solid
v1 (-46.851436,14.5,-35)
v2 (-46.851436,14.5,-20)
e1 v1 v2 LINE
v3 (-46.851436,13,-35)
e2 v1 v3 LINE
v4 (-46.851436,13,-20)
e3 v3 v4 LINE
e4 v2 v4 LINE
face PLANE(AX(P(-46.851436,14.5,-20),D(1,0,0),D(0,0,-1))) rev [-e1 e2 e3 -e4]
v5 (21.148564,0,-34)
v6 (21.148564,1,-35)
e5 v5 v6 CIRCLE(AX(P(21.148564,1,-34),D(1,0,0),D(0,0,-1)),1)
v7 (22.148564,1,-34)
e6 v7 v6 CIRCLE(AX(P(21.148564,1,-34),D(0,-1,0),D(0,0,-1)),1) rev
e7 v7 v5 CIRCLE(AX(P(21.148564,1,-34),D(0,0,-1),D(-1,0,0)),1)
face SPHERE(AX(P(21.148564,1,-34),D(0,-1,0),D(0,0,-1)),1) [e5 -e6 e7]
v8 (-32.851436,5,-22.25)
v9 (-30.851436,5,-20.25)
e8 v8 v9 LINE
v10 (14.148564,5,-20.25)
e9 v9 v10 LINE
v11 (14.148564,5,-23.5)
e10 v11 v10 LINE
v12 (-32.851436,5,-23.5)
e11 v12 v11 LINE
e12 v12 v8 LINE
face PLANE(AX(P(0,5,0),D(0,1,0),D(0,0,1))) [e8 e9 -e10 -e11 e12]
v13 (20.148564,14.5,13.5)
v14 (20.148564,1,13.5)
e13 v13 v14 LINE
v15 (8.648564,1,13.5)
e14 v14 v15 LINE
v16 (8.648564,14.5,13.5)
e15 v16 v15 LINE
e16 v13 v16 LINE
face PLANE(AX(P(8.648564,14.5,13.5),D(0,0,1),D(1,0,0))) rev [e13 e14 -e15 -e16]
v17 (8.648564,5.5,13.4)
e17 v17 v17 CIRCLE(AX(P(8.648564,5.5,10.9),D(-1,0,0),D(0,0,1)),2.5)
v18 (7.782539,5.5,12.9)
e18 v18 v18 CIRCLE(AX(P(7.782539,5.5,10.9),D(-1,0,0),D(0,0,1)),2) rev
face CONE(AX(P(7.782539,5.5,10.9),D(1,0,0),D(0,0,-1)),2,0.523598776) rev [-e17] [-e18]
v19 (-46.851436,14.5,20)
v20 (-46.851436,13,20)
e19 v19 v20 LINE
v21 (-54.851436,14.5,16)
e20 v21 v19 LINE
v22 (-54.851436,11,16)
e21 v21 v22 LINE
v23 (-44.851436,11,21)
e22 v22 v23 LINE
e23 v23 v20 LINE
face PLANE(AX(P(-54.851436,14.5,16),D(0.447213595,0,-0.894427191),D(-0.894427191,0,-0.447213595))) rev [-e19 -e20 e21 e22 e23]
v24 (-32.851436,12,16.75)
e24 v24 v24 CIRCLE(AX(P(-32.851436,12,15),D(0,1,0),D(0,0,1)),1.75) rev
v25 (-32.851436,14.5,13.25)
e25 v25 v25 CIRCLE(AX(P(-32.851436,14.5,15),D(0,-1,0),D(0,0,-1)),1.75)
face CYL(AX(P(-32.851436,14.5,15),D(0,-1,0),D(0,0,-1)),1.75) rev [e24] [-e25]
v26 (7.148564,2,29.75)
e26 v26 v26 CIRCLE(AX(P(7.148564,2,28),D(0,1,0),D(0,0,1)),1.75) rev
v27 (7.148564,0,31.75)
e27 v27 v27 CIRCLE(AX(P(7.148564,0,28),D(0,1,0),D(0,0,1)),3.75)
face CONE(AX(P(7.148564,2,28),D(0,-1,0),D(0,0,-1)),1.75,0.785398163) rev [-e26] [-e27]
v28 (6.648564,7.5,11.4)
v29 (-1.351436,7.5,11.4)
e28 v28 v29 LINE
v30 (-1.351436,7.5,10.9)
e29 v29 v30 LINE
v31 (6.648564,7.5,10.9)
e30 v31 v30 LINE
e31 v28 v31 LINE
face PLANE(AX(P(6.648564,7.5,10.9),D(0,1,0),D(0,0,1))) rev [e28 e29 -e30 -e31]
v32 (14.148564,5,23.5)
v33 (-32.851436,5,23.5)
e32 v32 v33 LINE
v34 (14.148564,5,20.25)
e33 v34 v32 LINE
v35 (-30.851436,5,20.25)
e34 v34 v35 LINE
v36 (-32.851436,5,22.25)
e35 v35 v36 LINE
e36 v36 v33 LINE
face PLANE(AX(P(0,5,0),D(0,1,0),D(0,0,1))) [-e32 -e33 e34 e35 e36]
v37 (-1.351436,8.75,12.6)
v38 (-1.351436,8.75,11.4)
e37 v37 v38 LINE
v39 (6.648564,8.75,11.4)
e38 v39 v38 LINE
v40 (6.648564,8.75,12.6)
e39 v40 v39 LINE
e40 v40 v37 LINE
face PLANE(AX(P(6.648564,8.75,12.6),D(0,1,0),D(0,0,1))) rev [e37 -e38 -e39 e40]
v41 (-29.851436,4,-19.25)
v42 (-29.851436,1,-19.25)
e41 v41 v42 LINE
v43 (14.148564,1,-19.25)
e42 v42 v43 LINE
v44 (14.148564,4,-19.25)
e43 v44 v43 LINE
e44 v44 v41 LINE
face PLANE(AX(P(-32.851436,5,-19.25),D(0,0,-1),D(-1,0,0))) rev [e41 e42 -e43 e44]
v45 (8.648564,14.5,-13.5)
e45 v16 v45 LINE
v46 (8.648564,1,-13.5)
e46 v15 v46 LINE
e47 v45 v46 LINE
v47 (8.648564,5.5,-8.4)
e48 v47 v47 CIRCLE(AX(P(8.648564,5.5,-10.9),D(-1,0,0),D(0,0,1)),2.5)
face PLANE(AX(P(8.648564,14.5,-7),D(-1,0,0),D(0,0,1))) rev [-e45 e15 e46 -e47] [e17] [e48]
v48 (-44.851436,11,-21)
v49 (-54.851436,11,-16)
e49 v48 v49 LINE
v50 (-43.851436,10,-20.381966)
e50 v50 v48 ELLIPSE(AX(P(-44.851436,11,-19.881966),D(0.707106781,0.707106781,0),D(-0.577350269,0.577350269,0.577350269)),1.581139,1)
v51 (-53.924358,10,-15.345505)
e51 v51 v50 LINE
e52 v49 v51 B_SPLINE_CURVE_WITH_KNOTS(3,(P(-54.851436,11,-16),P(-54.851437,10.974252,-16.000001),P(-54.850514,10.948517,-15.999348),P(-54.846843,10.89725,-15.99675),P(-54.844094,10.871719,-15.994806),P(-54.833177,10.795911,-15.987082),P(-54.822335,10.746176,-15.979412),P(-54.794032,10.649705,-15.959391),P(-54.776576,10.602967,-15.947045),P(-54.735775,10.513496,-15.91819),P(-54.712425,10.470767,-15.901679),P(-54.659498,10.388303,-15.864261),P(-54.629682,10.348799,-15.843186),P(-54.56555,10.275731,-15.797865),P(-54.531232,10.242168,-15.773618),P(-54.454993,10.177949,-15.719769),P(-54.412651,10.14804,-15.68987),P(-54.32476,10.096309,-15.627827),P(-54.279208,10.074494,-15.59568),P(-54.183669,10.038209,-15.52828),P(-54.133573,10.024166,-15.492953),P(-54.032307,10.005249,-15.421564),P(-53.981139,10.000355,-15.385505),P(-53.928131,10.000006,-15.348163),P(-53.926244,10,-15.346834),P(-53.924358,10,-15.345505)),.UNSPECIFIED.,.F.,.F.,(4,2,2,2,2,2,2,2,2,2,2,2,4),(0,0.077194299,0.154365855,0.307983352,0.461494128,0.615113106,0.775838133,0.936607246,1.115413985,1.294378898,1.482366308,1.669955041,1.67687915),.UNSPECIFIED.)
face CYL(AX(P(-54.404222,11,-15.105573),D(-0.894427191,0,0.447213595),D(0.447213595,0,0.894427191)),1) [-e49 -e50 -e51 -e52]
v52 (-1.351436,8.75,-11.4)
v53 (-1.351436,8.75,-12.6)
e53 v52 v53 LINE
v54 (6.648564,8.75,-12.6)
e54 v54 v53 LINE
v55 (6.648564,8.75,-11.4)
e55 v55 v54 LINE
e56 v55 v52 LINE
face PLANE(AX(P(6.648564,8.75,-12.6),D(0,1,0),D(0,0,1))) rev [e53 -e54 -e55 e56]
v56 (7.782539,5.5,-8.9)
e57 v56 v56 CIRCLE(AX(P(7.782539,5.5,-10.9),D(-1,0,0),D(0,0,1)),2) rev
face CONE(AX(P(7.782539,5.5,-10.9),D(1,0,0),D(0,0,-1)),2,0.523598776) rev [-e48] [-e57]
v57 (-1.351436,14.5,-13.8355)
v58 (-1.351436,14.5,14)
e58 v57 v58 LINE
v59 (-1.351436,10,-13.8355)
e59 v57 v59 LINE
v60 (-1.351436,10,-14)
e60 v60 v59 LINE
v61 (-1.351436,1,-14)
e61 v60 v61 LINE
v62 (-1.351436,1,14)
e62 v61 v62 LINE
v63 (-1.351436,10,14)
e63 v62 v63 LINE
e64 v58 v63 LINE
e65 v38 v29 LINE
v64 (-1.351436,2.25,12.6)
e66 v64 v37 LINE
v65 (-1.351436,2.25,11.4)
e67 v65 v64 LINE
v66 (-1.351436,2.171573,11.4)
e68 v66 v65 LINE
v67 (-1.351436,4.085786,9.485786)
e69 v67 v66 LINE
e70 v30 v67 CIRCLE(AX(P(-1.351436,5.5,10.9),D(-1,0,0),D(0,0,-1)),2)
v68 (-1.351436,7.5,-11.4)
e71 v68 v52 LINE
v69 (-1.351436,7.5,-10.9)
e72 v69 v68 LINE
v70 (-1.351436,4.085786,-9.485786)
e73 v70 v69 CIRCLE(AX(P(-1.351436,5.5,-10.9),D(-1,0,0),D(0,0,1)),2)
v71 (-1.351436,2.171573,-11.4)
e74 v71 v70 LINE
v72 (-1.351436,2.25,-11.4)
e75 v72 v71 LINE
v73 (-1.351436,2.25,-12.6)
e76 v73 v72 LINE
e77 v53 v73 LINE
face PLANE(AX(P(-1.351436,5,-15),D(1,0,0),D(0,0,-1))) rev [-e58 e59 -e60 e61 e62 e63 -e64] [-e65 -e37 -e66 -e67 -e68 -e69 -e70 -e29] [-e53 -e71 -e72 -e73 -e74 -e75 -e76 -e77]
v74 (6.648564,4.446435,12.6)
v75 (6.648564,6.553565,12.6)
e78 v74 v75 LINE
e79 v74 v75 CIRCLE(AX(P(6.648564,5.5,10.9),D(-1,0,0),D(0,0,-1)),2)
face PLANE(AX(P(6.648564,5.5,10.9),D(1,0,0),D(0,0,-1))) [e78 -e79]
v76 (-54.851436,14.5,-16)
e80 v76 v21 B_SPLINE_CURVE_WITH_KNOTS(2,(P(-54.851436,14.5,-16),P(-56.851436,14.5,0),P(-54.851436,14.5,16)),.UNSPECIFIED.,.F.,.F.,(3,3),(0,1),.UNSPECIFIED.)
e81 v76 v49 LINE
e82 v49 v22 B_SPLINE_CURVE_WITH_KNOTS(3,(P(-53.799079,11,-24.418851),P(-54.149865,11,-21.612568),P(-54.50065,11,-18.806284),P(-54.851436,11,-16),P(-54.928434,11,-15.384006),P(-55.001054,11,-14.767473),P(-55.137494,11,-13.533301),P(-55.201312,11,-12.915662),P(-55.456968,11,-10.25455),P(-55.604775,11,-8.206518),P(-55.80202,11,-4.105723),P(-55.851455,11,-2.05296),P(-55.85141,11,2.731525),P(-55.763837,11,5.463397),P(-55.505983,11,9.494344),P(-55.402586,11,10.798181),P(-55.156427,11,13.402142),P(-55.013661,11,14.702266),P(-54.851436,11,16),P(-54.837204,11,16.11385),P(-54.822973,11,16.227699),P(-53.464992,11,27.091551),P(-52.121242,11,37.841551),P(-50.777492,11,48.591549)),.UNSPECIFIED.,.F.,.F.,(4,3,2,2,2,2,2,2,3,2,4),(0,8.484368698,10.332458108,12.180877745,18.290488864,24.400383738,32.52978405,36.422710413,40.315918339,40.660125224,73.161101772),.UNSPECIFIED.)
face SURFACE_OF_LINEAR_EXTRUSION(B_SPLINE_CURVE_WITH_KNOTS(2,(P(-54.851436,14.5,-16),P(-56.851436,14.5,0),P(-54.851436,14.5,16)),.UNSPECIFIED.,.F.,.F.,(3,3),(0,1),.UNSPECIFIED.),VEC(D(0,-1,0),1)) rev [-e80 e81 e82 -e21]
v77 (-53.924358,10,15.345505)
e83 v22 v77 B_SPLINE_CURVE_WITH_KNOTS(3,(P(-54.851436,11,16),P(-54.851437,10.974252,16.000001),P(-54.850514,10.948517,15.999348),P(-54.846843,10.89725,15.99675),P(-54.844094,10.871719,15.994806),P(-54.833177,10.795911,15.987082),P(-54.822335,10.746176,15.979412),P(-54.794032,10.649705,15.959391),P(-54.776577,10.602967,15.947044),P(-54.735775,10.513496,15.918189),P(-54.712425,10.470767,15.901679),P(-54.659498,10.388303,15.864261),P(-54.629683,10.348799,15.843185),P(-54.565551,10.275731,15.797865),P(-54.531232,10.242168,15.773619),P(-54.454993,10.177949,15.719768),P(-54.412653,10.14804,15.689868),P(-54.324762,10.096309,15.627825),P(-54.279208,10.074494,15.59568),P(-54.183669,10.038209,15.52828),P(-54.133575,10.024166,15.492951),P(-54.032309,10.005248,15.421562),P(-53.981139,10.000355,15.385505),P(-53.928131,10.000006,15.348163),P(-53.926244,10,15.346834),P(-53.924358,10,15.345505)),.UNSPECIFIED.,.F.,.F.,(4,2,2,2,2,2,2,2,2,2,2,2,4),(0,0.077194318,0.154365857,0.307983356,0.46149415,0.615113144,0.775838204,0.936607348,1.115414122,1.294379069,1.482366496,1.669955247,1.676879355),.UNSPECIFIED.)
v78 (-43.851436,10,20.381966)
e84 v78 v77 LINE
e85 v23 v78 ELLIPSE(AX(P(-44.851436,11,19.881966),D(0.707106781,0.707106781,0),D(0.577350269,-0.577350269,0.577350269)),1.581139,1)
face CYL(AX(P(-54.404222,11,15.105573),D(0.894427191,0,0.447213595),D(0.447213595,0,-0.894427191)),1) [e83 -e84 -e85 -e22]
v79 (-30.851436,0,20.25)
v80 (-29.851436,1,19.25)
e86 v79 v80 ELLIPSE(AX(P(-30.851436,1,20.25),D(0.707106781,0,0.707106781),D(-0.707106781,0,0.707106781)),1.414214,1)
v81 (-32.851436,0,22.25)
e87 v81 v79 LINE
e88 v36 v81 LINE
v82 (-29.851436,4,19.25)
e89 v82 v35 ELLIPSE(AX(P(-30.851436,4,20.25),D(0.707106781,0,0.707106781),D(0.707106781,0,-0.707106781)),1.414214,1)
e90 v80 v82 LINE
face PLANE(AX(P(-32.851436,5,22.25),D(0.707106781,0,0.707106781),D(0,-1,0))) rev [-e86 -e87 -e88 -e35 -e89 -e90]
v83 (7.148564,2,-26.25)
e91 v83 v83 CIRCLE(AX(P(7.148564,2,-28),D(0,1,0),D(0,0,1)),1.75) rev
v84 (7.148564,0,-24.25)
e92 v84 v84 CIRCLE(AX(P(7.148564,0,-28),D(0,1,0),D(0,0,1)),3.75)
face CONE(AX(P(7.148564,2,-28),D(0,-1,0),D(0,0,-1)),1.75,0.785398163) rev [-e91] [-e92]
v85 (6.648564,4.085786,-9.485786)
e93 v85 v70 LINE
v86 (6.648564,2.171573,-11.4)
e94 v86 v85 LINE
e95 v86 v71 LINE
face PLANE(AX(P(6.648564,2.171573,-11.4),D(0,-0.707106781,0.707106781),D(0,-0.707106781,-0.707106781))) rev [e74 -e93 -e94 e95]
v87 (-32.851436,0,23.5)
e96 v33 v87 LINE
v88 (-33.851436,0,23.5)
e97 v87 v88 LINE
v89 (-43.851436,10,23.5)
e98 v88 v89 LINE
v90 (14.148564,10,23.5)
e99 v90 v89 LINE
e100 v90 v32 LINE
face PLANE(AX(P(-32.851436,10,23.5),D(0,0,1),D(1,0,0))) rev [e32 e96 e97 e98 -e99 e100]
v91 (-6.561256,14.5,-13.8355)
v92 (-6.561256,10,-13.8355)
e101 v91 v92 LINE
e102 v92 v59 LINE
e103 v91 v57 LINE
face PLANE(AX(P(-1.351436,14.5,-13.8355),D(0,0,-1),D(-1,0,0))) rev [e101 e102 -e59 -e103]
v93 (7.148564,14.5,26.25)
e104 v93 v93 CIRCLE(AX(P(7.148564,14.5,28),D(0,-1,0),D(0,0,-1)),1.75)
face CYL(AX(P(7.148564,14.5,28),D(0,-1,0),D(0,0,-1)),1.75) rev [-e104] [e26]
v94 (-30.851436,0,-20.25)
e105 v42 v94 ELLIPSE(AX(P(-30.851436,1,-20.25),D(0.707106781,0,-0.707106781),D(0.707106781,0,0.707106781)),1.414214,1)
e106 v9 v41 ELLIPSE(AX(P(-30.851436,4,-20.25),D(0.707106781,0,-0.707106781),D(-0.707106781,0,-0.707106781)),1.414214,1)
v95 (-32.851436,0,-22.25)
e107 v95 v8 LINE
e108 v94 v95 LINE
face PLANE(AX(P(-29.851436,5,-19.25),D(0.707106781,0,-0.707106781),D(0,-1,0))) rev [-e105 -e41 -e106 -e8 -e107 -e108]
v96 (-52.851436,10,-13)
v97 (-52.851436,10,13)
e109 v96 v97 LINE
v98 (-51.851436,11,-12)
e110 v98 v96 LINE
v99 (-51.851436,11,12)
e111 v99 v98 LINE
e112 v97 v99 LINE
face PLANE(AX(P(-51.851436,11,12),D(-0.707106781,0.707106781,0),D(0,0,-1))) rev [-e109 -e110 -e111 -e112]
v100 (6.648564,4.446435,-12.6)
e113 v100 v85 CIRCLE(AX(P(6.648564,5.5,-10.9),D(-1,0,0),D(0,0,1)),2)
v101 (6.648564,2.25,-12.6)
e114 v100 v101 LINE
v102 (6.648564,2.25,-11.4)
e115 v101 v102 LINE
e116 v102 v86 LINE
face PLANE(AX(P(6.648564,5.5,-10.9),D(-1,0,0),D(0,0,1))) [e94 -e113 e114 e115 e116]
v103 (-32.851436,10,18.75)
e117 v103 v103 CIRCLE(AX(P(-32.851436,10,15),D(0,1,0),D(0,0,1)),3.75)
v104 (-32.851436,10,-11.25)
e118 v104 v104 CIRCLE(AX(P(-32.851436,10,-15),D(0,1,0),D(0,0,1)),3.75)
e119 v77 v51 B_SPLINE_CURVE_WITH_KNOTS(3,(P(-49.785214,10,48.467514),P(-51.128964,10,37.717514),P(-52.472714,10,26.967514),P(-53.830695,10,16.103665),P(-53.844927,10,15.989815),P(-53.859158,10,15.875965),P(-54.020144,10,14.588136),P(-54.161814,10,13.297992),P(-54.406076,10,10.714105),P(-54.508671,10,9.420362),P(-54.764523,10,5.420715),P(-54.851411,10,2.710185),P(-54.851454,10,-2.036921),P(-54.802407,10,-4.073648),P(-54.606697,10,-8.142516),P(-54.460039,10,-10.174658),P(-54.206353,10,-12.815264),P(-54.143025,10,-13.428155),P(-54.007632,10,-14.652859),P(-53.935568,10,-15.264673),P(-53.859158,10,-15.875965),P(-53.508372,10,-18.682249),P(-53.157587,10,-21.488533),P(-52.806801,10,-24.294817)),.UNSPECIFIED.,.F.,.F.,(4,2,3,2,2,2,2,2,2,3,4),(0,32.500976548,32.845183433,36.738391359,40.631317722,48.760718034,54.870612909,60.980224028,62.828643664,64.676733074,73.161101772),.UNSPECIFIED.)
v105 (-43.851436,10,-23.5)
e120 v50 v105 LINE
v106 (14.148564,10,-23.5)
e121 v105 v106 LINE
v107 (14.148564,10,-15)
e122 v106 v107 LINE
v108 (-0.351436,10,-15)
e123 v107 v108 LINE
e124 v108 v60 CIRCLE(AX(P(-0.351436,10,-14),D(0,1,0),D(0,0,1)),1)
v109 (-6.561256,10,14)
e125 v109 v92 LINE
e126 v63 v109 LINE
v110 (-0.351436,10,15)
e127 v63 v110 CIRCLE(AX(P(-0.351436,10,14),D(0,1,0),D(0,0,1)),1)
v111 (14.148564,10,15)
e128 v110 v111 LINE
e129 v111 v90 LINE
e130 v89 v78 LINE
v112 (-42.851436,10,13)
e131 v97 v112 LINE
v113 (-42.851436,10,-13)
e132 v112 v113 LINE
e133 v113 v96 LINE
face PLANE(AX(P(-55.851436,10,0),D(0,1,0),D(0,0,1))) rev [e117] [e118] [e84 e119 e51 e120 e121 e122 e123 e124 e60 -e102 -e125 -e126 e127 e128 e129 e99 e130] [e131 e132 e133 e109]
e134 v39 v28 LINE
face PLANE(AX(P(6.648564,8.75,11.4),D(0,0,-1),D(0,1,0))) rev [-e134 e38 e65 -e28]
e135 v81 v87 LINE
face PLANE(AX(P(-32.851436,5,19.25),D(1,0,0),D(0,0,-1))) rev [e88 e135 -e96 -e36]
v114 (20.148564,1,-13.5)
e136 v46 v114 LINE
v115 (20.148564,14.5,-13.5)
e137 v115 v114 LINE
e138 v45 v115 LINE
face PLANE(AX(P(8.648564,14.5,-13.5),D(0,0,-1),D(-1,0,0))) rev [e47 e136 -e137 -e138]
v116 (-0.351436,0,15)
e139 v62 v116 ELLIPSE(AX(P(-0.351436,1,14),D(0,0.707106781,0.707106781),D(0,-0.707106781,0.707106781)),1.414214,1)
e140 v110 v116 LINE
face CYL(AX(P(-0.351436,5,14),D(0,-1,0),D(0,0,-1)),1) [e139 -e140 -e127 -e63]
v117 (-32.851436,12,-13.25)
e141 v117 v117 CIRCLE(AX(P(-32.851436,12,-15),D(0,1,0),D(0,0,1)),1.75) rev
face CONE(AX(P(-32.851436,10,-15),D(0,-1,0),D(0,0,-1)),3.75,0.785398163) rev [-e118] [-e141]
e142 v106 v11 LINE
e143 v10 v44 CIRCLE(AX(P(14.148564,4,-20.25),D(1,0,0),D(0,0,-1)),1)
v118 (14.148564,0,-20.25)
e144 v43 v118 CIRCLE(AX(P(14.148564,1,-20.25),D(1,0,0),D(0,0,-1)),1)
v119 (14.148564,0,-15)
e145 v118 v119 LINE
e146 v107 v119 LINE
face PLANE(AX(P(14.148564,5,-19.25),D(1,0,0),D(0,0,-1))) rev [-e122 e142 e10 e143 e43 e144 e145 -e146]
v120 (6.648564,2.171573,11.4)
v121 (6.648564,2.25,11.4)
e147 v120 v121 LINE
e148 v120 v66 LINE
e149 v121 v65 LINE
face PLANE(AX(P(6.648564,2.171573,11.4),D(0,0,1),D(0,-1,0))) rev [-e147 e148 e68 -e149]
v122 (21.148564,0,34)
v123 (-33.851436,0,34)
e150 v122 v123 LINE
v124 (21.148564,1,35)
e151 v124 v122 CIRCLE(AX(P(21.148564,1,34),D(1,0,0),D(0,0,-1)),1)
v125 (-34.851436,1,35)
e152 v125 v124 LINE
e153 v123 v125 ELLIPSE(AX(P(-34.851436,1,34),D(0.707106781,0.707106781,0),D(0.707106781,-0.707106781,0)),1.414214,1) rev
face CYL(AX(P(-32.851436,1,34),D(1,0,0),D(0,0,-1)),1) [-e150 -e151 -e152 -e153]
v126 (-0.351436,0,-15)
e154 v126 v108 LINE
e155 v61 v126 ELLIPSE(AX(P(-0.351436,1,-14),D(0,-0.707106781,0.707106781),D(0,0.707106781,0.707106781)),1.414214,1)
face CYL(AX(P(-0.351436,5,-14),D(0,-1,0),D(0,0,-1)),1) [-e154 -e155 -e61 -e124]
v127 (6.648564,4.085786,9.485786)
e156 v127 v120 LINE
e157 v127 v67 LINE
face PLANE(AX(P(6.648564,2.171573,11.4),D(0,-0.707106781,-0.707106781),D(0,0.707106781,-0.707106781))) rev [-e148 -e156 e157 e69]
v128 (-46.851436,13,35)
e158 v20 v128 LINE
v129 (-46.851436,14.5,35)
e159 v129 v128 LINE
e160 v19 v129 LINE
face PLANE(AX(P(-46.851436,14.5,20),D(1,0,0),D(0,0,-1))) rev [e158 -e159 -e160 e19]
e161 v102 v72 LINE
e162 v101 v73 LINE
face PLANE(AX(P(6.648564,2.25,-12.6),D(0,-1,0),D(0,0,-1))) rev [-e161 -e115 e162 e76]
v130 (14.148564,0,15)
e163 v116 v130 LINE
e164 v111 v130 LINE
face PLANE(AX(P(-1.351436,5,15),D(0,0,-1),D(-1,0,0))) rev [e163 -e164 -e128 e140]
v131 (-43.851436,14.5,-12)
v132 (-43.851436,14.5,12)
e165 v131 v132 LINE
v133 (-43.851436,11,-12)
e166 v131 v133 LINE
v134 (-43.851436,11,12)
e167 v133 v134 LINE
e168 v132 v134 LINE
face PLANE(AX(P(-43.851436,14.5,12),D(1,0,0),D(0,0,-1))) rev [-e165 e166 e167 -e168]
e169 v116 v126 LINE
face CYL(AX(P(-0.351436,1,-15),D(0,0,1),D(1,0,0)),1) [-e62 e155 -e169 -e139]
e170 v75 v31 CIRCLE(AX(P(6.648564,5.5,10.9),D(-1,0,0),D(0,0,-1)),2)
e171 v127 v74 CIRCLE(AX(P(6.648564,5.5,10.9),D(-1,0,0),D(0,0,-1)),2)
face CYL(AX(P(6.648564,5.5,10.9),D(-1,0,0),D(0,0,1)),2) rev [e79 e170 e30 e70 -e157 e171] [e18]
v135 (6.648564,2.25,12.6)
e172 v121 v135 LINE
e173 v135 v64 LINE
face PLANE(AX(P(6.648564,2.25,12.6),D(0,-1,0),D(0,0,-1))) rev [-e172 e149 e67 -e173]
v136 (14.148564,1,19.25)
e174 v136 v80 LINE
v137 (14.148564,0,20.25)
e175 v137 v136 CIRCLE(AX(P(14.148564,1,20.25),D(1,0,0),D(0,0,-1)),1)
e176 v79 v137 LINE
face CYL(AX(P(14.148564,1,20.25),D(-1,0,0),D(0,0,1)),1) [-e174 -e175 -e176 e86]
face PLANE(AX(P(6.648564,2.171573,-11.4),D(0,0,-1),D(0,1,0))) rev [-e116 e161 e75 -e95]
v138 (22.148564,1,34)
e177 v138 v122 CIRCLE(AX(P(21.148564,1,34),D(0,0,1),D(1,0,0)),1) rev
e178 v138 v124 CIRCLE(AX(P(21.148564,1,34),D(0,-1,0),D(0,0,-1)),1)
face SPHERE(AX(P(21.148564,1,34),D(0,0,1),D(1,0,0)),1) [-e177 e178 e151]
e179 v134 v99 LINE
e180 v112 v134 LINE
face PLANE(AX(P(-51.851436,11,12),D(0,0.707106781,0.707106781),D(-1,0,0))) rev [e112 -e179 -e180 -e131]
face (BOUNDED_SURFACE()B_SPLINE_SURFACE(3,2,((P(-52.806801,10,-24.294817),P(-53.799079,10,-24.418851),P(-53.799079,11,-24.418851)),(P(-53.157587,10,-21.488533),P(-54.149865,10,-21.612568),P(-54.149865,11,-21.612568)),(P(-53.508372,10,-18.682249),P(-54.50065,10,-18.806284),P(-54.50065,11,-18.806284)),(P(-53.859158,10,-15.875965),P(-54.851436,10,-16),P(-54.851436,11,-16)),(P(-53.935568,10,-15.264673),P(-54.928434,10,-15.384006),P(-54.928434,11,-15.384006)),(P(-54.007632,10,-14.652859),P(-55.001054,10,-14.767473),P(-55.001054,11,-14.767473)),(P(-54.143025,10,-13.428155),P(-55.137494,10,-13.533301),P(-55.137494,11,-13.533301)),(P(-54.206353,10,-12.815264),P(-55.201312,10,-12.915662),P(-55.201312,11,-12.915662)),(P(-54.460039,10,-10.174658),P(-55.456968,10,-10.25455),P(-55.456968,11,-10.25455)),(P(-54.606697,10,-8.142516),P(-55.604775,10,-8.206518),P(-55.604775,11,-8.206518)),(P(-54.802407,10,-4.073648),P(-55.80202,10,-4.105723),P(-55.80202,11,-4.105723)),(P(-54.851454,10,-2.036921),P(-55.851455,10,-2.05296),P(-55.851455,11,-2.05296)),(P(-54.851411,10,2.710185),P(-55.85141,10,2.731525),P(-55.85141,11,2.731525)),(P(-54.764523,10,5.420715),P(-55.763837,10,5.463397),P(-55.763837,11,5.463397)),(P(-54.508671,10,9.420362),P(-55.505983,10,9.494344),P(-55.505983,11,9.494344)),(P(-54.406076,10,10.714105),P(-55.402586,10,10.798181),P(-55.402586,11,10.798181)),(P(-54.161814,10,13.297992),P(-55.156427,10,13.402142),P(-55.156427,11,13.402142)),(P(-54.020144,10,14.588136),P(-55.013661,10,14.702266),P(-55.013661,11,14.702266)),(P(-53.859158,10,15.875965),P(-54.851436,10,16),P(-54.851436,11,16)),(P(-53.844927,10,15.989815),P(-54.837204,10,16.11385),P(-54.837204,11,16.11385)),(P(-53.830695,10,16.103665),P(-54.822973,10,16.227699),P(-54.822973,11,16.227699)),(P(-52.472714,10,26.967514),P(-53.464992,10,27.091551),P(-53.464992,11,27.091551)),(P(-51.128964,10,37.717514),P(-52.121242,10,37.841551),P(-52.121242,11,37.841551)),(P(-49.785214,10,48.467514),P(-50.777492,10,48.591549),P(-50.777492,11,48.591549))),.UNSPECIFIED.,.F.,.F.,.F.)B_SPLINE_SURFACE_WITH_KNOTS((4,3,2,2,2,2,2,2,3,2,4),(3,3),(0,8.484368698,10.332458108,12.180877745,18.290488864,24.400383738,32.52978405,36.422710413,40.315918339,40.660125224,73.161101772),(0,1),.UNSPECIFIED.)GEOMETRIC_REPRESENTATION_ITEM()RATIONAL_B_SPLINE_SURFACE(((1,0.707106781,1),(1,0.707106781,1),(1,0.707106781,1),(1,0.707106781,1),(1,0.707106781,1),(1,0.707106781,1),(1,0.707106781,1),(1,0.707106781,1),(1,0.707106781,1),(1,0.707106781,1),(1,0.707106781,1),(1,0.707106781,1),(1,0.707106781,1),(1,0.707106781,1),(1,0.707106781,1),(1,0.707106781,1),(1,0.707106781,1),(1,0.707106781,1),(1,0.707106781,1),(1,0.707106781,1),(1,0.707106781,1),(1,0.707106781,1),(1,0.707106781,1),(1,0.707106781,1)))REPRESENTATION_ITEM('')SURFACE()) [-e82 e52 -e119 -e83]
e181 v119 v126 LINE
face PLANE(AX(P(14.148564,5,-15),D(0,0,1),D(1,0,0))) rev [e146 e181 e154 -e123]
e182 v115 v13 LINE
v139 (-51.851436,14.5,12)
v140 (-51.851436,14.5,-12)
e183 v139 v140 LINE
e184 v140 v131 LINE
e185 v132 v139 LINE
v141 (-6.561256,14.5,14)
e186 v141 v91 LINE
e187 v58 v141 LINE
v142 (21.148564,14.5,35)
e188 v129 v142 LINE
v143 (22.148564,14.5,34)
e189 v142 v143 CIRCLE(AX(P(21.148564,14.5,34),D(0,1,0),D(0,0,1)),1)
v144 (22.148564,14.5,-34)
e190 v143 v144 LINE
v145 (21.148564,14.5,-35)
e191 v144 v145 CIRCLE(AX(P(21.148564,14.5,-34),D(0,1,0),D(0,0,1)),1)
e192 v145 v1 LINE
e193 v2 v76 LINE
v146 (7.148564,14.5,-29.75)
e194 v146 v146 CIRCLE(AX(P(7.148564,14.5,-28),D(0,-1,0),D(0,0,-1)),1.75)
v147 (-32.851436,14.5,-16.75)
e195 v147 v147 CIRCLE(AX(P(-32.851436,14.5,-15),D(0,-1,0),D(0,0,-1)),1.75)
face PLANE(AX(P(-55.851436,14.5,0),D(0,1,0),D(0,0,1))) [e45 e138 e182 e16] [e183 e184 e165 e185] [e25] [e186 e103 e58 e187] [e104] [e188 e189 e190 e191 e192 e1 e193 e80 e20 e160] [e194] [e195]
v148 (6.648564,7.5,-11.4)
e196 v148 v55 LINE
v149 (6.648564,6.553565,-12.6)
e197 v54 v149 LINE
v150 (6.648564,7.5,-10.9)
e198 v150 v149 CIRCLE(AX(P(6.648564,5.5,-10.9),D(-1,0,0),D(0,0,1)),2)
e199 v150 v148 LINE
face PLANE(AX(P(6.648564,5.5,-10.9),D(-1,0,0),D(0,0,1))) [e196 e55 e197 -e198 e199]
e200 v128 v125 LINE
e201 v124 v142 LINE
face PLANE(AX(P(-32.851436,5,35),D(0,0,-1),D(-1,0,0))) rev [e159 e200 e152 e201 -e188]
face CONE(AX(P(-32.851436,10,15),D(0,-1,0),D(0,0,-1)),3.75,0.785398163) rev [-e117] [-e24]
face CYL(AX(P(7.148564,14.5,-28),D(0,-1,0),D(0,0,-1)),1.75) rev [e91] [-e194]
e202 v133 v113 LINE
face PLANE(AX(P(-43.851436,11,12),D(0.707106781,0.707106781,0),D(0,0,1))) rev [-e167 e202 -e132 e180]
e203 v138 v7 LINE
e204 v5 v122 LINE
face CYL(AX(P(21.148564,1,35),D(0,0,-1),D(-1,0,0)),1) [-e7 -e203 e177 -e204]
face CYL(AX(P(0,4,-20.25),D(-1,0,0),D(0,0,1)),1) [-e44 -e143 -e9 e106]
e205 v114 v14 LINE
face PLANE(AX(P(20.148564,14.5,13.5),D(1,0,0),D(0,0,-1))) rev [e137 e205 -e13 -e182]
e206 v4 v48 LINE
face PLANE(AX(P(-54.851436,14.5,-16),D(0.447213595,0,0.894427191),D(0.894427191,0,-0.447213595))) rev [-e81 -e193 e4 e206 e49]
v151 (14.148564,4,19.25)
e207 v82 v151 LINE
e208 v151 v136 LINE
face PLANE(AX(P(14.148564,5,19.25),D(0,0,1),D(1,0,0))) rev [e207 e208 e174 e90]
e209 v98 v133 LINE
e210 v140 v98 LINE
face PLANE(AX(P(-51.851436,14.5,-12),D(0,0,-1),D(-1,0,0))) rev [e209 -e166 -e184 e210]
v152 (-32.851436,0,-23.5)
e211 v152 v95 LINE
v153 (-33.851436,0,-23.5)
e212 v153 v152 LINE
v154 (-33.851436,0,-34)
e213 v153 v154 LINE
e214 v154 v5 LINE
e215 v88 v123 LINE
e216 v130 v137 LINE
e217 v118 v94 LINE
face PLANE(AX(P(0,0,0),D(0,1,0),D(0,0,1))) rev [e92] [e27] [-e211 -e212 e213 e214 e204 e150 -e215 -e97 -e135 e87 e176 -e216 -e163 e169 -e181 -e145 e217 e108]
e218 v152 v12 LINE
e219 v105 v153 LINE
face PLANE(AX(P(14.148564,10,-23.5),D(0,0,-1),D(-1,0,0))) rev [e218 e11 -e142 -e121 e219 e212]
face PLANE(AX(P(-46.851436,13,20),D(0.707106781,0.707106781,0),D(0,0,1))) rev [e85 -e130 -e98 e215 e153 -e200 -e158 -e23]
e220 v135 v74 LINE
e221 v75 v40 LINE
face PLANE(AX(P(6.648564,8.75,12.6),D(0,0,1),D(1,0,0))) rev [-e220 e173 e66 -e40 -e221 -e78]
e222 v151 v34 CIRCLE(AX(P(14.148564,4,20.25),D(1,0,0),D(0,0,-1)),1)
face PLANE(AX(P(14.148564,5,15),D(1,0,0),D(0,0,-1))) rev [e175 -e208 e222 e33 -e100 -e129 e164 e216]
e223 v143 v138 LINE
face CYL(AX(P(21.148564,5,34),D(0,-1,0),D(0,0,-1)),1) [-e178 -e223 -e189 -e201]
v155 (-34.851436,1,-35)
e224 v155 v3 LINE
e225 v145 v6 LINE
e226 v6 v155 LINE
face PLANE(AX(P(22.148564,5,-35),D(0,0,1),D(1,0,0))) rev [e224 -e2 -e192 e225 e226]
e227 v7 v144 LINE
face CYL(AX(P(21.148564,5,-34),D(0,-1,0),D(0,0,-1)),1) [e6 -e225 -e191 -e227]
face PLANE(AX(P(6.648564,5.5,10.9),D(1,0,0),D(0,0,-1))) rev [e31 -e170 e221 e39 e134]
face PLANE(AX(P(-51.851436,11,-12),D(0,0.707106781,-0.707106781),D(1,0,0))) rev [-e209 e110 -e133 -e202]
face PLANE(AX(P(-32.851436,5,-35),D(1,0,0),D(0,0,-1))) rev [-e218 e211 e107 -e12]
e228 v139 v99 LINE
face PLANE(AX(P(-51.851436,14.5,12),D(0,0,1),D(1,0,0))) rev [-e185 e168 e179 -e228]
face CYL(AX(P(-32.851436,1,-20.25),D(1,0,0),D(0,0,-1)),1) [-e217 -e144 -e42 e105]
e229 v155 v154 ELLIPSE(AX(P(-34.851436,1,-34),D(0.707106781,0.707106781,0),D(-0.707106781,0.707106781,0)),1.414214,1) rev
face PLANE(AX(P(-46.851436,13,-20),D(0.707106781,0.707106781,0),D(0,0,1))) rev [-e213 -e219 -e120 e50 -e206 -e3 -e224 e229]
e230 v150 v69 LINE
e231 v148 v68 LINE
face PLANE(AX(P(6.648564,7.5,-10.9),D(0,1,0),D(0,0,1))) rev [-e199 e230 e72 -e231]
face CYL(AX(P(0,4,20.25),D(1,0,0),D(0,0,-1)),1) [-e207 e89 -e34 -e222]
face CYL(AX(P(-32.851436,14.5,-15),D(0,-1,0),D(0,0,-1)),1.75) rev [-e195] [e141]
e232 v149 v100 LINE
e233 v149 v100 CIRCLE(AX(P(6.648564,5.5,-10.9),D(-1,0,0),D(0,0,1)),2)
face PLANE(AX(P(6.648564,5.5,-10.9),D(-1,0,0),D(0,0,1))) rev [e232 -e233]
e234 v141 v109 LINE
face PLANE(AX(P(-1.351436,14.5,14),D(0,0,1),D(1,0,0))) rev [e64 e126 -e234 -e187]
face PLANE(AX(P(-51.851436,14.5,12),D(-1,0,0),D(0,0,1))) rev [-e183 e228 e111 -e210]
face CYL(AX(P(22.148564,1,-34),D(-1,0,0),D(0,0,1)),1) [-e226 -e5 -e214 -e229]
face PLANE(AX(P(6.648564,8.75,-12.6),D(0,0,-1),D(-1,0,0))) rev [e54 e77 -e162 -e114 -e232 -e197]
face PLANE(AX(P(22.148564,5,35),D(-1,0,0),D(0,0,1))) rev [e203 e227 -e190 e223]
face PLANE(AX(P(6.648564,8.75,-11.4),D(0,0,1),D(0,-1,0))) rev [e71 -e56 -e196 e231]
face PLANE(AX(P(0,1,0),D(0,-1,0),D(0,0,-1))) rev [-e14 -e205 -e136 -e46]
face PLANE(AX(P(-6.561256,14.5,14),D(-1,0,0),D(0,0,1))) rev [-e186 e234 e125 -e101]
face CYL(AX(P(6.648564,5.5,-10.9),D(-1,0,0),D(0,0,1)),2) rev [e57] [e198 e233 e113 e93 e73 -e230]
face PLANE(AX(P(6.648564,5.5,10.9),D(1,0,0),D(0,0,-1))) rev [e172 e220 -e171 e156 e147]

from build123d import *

# Parameters (mm, degrees)
BOSS_EXTRUDE2_DEPTH     = 5
BOSS_EXTRUDE3_DEPTH     = 5
BOSS_EXTRUDE4_DEPTH     = 4.5
CHAMFER1_SIZE           = 3
BOSS_EXTRUDE5_DEPTH     = 11.5
BOSS_EXTRUDE6_DEPTH     = 11.5
FILLET2_R               = 1
SKETCH11_W              = 8
SKETCH11_H              = 24
CUT_EXTRUDE6_DEPTH      = 67.666204955
CUT_EXTRUDE7_START      = -1
CUT_EXTRUDE7_DEPTH      = 67.488020314
CUT_EXTRUDE8_DEPTH      = 8
FILLET3_R               = 1
CHAMFER9_SIZE           = 1
CUT_EXTRUDE9_DEPTH      = 67.666205085
CUT_EXTRUDE9_DEPTH_BACK = 67.666205085
SKETCH14_R              = 1.75
CHAMFER10_SIZE          = 2
CHAMFER8_SIZE           = 3
SKETCH16_W              = 5.209820602
SKETCH16_H              = 27.835500312
CUT_EXTRUDE10_DEPTH     = 67.666205085
CUT_EXTRUDE11_REACH     = 75.086
SKETCH17_R              = 2
CHAMFER12_SIZE          = 0.5
CHAMFER12_SIZE2         = 0.866025404


with BuildPart() as part:
    # Sketch1 → Boss-Extrude2 (new body)
    with BuildSketch(Plane(origin=(0, 0, 0), x_dir=(1, 0, 0), z_dir=(0, 1, 0))):
        Polygon((-32.851435656, 19.25), (14.148564344, 19.25), (14.148564344, 15), (-1.351435656, 15), (-1.351435656, -15), (14.148564344, -15), (14.148564344, -19.25), (-32.851435656, -19.25), (-32.851435656, -35), (22.148564344, -35), (22.148564344, 35), (-32.851435656, 35), align=None)
    extrude(amount=BOSS_EXTRUDE2_DEPTH)

    # Sketch5 → Boss-Extrude3 (add)
    with BuildSketch(Plane(origin=(0, 5, 0), x_dir=(1, 0, 0), z_dir=(0, 1, 0))):
        Polygon((-32.851435656, 35), (22.148564344, 35), (22.148564344, -35), (-32.851435656, -35), (-32.851435656, -23.5), (14.148564344, -23.5), (14.148564344, -15), (-1.351435656, -15), (-1.351435656, 15), (14.148564344, 15), (14.148564344, 23.5), (-32.851435656, 23.5), align=None)
    extrude(amount=BOSS_EXTRUDE3_DEPTH)

    # Sketch6 → Boss-Extrude4 (add)
    with BuildSketch(Plane(origin=(0, 10, 0), x_dir=(1, 0, 0), z_dir=(0, 1, 0))):
        with BuildLine():
            Line((22.148564344, 35), (-46.851435656, 35))
            Line((-46.851435656, 35), (-46.851435656, 20))
            Line((-46.851435656, 20), (-54.851435656, 16))
            add(Edge.make_bspline(
                [(-54.851435656, -16), (-56.851435656, 0), (-54.851435656, 16)],
                knots=[0, 0, 0, 1, 1, 1], degree=2))
            Line((-54.851435656, -16), (-46.851435656, -20))
            Line((-46.851435656, -20), (-46.851435656, -35))
            Line((-46.851435656, -35), (22.148564344, -35))
            Line((22.148564344, -35), (22.148564344, -23))
            Line((22.148564344, -23), (22.148564344, 23))
            Line((22.148564344, 23), (22.148564344, 35))
        make_face()
    extrude(amount=BOSS_EXTRUDE4_DEPTH)

    # Chamfer1
    chamfer1_edges = [part.edges().sort_by_distance(p)[0] for p in [
        (-46.851435656, 10, -27.5),
        (-46.851435656, 10, 27.5),
    ]]
    chamfer(chamfer1_edges, length=CHAMFER1_SIZE)

    # Sketch7 → Boss-Extrude5 (add)
    with BuildSketch(Plane.XY.offset(35)):
        Polygon((-33.851435656, 0), (-43.851435656, 10), (-32.851435656, 10), (-32.851435656, 0), align=None)
    extrude(amount=-BOSS_EXTRUDE5_DEPTH)

    # Sketch8 → Boss-Extrude6 (add)
    with BuildSketch(Plane(origin=(0, 0, -35), x_dir=(-1, 0, 0), z_dir=(0, 0, -1))):
        Polygon((43.851435656, 10), (33.851435656, 0), (32.851435656, 0), (32.851435656, 10), align=None)
    extrude(amount=-BOSS_EXTRUDE6_DEPTH)

    # Fillet2
    fillet2_edges = [part.edges().sort_by_distance(p)[0] for p in [
        (-5.851435656, 0, -35),
        (22.148564344, 0, 0),
        (-5.851435656, 0, 35),
        (-9.351435656, 0, 19.25),
        (-1.351435656, 0, 0),
        (-9.351435656, 0, -19.25),
        (22.148564344, 7.25, -35),
        (22.148564344, 7.25, 35),
        (-1.351435656, 5, 15),
        (-1.351435656, 5, -15),
        (-9.351435656, 5, 19.25),
        (-9.351435656, 5, -19.25),
    ]]
    fillet(fillet2_edges, radius=FILLET2_R)

    # Sketch11 → Cut-Extrude6 (cut, through all)
    with BuildSketch(Plane.XZ.offset(-10)):
        with Locations((-47.851435656, 0)):
            Rectangle(SKETCH11_W, SKETCH11_H)
    extrude(amount=-CUT_EXTRUDE6_DEPTH, mode=Mode.SUBTRACT)

    # Sketch12 → Cut-Extrude7 (cut, through all)
    with BuildSketch(Plane.XZ.offset(CUT_EXTRUDE7_START)):
        Polygon((8.648564344, 13.5), (20.148564344, 13.5), (20.148564344, -13.5), (8.648564344, -13.5), (8.648564344, -7), (8.648564344, 7), align=None)
    extrude(amount=-CUT_EXTRUDE7_DEPTH, mode=Mode.SUBTRACT)

    # Sketch13 → Cut-Extrude8 (cut)
    with BuildSketch(Plane.ZY.offset(1.351435656)):
        with BuildLine():
            Line((11.4, 2.171572875), (11.4, 2.25))
            Line((11.4, 2.25), (12.6, 2.25))
            Line((12.6, 2.25), (12.6, 8.75))
            Line((12.6, 8.75), (11.4, 8.75))
            Line((11.4, 8.75), (11.4, 7.5))
            Line((11.4, 7.5), (10.9, 7.5))
            ThreePointArc((10.9, 7.5), (9.052240935, 6.265366865), (9.485786438, 4.085786438))
            Line((9.485786438, 4.085786438), (11.4, 2.171572875))
        make_face()
        with BuildLine():
            Line((-12.6, 8.75), (-11.4, 8.75))
            Line((-11.4, 8.75), (-11.4, 7.5))
            Line((-11.4, 7.5), (-10.9, 7.5))
            ThreePointArc((-10.9, 7.5), (-9.052240935, 6.265366865), (-9.485786438, 4.085786438))
            Line((-9.485786438, 4.085786438), (-11.4, 2.171572875))
            Line((-11.4, 2.171572875), (-11.4, 2.25))
            Line((-11.4, 2.25), (-12.6, 2.25))
            Line((-12.6, 2.25), (-12.6, 8.75))
        make_face()
    extrude(amount=-CUT_EXTRUDE8_DEPTH, mode=Mode.SUBTRACT)

    # Fillet3
    fillet3_edges = [part.edges().sort_by_distance(p)[0] for p in [
        (-49.351435656, 10, -18.75),
        (-55.851435656, 10, 0),
        (-49.351435656, 10, 18.75),
    ]]
    fillet(fillet3_edges, radius=FILLET3_R)

    # Chamfer9
    chamfer9_edges = [part.edges().sort_by_distance(p)[0] for p in [
        (-51.851435656, 10, 0),
        (-47.851435656, 10, -12),
        (-43.851435656, 10, 0),
        (-47.851435656, 10, 12),
    ]]
    chamfer(chamfer9_edges, length=CHAMFER9_SIZE)

    # Sketch14 → Cut-Extrude9 (cut, two sides: drawn at the far end of the back side and taken through both)
    with BuildSketch(Plane.XZ.offset(-10).offset(-CUT_EXTRUDE9_DEPTH_BACK)):
        with Locations(Location((-32.851435656, 15, 0), (0, 0, 270))):
            Circle(SKETCH14_R)
        with Locations(Location((-32.851435656, -15, 0), (0, 0, 270))):
            Circle(SKETCH14_R)
        with Locations((27.148564344, -15)):
            Circle(SKETCH14_R)
        with Locations((27.148564344, 15)):
            Circle(SKETCH14_R)
        with Locations(Location((7.148564344, 28, 0), (0, 0, 270))):
            Circle(SKETCH14_R)
        with Locations(Location((7.148564344, -28, 0), (0, 0, 270))):
            Circle(SKETCH14_R)
    extrude(amount=CUT_EXTRUDE9_DEPTH + CUT_EXTRUDE9_DEPTH_BACK, mode=Mode.SUBTRACT)

    # Chamfer10
    chamfer10_edges = [part.edges().sort_by_distance(p)[0] for p in [
        (7.148564344, 0, -26.25),
        (-32.851435656, 10, -13.25),
        (7.148564344, 0, 29.75),
        (-32.851435656, 10, 16.75),
    ]]
    chamfer(chamfer10_edges, length=CHAMFER10_SIZE)

    # Chamfer8
    # the kernel refuses this chamfer: 3 mm, written as the material it takes off along each edge
    with BuildSketch(Plane(origin=(-32.851435656, -6.715048964, -19.25), x_dir=(0.9996219169112965, 0, 0.02749587661058676), z_dir=(0, 1, 0))) as chamfer8_piece_1_section:
        Polygon((CHAMFER8_SIZE * 0.999621916911, CHAMFER8_SIZE * 0.0274958766106), (-CHAMFER8_SIZE * 0.0274958766106, CHAMFER8_SIZE * 0.999621916911), (0, 0), align=None)
    chamfer8_piece_1 = extrude(amount=18.430097928, mode=Mode.PRIVATE)
    chamfer8_piece_1 = split(chamfer8_piece_1, bisect_by=Plane(origin=(-31.873507714, 5, -20.294144115), z_dir=(0, -1, 0)), keep=Keep.TOP, mode=Mode.PRIVATE)
    add(chamfer8_piece_1, mode=Mode.SUBTRACT)
    with BuildSketch(Plane(origin=(-32.851435656, -6.715048964, 19.25), x_dir=(0.9996219169112968, 0, -0.027495876610586733), z_dir=(0, 1, 0))) as chamfer8_piece_2_section:
        Polygon((CHAMFER8_SIZE * 0.999621916911, -CHAMFER8_SIZE * 0.0274958766106), (-CHAMFER8_SIZE * 0.0274958766106, -CHAMFER8_SIZE * 0.999621916911), (0, 0), align=None)
    chamfer8_piece_2 = extrude(amount=18.430097928, mode=Mode.PRIVATE)
    chamfer8_piece_2 = split(chamfer8_piece_2, bisect_by=Plane(origin=(-31.873507712, 5, 20.294144115), z_dir=(0, -1, 0)), keep=Keep.TOP, mode=Mode.PRIVATE)
    add(chamfer8_piece_2, mode=Mode.SUBTRACT)

    # Sketch16 → Cut-Extrude10 (cut, through all)
    with BuildSketch(Plane.XZ.offset(-10)):
        with Locations((-3.956345957, 0.082249844)):
            Rectangle(SKETCH16_W, SKETCH16_H)
    extrude(amount=-CUT_EXTRUDE10_DEPTH, mode=Mode.SUBTRACT)

    # Sketch17 → Cut-Extrude11 (cut, up to next)
    with BuildSketch(Plane.ZY.offset(-6.648564344), mode=Mode.PRIVATE) as cut_extrude11_sk1:
        with Locations((-10.9, 5.5)):
            Circle(SKETCH17_R)
    cut_extrude11_tool1 = extrude(cut_extrude11_sk1.sketch, amount=-CUT_EXTRUDE11_REACH, mode=Mode.PRIVATE) & part.part
    # Sketch17 → Cut-Extrude11 (cut, up to next)
    with BuildSketch(Plane.ZY.offset(-6.648564344), mode=Mode.PRIVATE) as cut_extrude11_sk2:
        with Locations((10.9, 5.5)):
            Circle(SKETCH17_R)
    cut_extrude11_tool2 = extrude(cut_extrude11_sk2.sketch, amount=-CUT_EXTRUDE11_REACH, mode=Mode.PRIVATE) & part.part
    add(cut_extrude11_tool1.solids().sort_by_distance((6.648564, 5.5, -10.9))[0], mode=Mode.SUBTRACT)
    add(cut_extrude11_tool2.solids().sort_by_distance((6.648564, 5.5, 10.9))[0], mode=Mode.SUBTRACT)

    # Chamfer12
    chamfer12_edges = [part.edges().sort_by_distance(p)[0] for p in [
        (8.648564344, 5.5, -12.9),
        (8.648564344, 5.5, 8.9),
    ]]
    chamfer12_side = [part.faces().sort_by_distance(p)[0] for p in [
        (8.648564344, 7.91662971, 0),
    ]]
    chamfer(chamfer12_edges, length=CHAMFER12_SIZE, length2=CHAMFER12_SIZE2, reference=chamfer12_side[0])


solid = part.part
